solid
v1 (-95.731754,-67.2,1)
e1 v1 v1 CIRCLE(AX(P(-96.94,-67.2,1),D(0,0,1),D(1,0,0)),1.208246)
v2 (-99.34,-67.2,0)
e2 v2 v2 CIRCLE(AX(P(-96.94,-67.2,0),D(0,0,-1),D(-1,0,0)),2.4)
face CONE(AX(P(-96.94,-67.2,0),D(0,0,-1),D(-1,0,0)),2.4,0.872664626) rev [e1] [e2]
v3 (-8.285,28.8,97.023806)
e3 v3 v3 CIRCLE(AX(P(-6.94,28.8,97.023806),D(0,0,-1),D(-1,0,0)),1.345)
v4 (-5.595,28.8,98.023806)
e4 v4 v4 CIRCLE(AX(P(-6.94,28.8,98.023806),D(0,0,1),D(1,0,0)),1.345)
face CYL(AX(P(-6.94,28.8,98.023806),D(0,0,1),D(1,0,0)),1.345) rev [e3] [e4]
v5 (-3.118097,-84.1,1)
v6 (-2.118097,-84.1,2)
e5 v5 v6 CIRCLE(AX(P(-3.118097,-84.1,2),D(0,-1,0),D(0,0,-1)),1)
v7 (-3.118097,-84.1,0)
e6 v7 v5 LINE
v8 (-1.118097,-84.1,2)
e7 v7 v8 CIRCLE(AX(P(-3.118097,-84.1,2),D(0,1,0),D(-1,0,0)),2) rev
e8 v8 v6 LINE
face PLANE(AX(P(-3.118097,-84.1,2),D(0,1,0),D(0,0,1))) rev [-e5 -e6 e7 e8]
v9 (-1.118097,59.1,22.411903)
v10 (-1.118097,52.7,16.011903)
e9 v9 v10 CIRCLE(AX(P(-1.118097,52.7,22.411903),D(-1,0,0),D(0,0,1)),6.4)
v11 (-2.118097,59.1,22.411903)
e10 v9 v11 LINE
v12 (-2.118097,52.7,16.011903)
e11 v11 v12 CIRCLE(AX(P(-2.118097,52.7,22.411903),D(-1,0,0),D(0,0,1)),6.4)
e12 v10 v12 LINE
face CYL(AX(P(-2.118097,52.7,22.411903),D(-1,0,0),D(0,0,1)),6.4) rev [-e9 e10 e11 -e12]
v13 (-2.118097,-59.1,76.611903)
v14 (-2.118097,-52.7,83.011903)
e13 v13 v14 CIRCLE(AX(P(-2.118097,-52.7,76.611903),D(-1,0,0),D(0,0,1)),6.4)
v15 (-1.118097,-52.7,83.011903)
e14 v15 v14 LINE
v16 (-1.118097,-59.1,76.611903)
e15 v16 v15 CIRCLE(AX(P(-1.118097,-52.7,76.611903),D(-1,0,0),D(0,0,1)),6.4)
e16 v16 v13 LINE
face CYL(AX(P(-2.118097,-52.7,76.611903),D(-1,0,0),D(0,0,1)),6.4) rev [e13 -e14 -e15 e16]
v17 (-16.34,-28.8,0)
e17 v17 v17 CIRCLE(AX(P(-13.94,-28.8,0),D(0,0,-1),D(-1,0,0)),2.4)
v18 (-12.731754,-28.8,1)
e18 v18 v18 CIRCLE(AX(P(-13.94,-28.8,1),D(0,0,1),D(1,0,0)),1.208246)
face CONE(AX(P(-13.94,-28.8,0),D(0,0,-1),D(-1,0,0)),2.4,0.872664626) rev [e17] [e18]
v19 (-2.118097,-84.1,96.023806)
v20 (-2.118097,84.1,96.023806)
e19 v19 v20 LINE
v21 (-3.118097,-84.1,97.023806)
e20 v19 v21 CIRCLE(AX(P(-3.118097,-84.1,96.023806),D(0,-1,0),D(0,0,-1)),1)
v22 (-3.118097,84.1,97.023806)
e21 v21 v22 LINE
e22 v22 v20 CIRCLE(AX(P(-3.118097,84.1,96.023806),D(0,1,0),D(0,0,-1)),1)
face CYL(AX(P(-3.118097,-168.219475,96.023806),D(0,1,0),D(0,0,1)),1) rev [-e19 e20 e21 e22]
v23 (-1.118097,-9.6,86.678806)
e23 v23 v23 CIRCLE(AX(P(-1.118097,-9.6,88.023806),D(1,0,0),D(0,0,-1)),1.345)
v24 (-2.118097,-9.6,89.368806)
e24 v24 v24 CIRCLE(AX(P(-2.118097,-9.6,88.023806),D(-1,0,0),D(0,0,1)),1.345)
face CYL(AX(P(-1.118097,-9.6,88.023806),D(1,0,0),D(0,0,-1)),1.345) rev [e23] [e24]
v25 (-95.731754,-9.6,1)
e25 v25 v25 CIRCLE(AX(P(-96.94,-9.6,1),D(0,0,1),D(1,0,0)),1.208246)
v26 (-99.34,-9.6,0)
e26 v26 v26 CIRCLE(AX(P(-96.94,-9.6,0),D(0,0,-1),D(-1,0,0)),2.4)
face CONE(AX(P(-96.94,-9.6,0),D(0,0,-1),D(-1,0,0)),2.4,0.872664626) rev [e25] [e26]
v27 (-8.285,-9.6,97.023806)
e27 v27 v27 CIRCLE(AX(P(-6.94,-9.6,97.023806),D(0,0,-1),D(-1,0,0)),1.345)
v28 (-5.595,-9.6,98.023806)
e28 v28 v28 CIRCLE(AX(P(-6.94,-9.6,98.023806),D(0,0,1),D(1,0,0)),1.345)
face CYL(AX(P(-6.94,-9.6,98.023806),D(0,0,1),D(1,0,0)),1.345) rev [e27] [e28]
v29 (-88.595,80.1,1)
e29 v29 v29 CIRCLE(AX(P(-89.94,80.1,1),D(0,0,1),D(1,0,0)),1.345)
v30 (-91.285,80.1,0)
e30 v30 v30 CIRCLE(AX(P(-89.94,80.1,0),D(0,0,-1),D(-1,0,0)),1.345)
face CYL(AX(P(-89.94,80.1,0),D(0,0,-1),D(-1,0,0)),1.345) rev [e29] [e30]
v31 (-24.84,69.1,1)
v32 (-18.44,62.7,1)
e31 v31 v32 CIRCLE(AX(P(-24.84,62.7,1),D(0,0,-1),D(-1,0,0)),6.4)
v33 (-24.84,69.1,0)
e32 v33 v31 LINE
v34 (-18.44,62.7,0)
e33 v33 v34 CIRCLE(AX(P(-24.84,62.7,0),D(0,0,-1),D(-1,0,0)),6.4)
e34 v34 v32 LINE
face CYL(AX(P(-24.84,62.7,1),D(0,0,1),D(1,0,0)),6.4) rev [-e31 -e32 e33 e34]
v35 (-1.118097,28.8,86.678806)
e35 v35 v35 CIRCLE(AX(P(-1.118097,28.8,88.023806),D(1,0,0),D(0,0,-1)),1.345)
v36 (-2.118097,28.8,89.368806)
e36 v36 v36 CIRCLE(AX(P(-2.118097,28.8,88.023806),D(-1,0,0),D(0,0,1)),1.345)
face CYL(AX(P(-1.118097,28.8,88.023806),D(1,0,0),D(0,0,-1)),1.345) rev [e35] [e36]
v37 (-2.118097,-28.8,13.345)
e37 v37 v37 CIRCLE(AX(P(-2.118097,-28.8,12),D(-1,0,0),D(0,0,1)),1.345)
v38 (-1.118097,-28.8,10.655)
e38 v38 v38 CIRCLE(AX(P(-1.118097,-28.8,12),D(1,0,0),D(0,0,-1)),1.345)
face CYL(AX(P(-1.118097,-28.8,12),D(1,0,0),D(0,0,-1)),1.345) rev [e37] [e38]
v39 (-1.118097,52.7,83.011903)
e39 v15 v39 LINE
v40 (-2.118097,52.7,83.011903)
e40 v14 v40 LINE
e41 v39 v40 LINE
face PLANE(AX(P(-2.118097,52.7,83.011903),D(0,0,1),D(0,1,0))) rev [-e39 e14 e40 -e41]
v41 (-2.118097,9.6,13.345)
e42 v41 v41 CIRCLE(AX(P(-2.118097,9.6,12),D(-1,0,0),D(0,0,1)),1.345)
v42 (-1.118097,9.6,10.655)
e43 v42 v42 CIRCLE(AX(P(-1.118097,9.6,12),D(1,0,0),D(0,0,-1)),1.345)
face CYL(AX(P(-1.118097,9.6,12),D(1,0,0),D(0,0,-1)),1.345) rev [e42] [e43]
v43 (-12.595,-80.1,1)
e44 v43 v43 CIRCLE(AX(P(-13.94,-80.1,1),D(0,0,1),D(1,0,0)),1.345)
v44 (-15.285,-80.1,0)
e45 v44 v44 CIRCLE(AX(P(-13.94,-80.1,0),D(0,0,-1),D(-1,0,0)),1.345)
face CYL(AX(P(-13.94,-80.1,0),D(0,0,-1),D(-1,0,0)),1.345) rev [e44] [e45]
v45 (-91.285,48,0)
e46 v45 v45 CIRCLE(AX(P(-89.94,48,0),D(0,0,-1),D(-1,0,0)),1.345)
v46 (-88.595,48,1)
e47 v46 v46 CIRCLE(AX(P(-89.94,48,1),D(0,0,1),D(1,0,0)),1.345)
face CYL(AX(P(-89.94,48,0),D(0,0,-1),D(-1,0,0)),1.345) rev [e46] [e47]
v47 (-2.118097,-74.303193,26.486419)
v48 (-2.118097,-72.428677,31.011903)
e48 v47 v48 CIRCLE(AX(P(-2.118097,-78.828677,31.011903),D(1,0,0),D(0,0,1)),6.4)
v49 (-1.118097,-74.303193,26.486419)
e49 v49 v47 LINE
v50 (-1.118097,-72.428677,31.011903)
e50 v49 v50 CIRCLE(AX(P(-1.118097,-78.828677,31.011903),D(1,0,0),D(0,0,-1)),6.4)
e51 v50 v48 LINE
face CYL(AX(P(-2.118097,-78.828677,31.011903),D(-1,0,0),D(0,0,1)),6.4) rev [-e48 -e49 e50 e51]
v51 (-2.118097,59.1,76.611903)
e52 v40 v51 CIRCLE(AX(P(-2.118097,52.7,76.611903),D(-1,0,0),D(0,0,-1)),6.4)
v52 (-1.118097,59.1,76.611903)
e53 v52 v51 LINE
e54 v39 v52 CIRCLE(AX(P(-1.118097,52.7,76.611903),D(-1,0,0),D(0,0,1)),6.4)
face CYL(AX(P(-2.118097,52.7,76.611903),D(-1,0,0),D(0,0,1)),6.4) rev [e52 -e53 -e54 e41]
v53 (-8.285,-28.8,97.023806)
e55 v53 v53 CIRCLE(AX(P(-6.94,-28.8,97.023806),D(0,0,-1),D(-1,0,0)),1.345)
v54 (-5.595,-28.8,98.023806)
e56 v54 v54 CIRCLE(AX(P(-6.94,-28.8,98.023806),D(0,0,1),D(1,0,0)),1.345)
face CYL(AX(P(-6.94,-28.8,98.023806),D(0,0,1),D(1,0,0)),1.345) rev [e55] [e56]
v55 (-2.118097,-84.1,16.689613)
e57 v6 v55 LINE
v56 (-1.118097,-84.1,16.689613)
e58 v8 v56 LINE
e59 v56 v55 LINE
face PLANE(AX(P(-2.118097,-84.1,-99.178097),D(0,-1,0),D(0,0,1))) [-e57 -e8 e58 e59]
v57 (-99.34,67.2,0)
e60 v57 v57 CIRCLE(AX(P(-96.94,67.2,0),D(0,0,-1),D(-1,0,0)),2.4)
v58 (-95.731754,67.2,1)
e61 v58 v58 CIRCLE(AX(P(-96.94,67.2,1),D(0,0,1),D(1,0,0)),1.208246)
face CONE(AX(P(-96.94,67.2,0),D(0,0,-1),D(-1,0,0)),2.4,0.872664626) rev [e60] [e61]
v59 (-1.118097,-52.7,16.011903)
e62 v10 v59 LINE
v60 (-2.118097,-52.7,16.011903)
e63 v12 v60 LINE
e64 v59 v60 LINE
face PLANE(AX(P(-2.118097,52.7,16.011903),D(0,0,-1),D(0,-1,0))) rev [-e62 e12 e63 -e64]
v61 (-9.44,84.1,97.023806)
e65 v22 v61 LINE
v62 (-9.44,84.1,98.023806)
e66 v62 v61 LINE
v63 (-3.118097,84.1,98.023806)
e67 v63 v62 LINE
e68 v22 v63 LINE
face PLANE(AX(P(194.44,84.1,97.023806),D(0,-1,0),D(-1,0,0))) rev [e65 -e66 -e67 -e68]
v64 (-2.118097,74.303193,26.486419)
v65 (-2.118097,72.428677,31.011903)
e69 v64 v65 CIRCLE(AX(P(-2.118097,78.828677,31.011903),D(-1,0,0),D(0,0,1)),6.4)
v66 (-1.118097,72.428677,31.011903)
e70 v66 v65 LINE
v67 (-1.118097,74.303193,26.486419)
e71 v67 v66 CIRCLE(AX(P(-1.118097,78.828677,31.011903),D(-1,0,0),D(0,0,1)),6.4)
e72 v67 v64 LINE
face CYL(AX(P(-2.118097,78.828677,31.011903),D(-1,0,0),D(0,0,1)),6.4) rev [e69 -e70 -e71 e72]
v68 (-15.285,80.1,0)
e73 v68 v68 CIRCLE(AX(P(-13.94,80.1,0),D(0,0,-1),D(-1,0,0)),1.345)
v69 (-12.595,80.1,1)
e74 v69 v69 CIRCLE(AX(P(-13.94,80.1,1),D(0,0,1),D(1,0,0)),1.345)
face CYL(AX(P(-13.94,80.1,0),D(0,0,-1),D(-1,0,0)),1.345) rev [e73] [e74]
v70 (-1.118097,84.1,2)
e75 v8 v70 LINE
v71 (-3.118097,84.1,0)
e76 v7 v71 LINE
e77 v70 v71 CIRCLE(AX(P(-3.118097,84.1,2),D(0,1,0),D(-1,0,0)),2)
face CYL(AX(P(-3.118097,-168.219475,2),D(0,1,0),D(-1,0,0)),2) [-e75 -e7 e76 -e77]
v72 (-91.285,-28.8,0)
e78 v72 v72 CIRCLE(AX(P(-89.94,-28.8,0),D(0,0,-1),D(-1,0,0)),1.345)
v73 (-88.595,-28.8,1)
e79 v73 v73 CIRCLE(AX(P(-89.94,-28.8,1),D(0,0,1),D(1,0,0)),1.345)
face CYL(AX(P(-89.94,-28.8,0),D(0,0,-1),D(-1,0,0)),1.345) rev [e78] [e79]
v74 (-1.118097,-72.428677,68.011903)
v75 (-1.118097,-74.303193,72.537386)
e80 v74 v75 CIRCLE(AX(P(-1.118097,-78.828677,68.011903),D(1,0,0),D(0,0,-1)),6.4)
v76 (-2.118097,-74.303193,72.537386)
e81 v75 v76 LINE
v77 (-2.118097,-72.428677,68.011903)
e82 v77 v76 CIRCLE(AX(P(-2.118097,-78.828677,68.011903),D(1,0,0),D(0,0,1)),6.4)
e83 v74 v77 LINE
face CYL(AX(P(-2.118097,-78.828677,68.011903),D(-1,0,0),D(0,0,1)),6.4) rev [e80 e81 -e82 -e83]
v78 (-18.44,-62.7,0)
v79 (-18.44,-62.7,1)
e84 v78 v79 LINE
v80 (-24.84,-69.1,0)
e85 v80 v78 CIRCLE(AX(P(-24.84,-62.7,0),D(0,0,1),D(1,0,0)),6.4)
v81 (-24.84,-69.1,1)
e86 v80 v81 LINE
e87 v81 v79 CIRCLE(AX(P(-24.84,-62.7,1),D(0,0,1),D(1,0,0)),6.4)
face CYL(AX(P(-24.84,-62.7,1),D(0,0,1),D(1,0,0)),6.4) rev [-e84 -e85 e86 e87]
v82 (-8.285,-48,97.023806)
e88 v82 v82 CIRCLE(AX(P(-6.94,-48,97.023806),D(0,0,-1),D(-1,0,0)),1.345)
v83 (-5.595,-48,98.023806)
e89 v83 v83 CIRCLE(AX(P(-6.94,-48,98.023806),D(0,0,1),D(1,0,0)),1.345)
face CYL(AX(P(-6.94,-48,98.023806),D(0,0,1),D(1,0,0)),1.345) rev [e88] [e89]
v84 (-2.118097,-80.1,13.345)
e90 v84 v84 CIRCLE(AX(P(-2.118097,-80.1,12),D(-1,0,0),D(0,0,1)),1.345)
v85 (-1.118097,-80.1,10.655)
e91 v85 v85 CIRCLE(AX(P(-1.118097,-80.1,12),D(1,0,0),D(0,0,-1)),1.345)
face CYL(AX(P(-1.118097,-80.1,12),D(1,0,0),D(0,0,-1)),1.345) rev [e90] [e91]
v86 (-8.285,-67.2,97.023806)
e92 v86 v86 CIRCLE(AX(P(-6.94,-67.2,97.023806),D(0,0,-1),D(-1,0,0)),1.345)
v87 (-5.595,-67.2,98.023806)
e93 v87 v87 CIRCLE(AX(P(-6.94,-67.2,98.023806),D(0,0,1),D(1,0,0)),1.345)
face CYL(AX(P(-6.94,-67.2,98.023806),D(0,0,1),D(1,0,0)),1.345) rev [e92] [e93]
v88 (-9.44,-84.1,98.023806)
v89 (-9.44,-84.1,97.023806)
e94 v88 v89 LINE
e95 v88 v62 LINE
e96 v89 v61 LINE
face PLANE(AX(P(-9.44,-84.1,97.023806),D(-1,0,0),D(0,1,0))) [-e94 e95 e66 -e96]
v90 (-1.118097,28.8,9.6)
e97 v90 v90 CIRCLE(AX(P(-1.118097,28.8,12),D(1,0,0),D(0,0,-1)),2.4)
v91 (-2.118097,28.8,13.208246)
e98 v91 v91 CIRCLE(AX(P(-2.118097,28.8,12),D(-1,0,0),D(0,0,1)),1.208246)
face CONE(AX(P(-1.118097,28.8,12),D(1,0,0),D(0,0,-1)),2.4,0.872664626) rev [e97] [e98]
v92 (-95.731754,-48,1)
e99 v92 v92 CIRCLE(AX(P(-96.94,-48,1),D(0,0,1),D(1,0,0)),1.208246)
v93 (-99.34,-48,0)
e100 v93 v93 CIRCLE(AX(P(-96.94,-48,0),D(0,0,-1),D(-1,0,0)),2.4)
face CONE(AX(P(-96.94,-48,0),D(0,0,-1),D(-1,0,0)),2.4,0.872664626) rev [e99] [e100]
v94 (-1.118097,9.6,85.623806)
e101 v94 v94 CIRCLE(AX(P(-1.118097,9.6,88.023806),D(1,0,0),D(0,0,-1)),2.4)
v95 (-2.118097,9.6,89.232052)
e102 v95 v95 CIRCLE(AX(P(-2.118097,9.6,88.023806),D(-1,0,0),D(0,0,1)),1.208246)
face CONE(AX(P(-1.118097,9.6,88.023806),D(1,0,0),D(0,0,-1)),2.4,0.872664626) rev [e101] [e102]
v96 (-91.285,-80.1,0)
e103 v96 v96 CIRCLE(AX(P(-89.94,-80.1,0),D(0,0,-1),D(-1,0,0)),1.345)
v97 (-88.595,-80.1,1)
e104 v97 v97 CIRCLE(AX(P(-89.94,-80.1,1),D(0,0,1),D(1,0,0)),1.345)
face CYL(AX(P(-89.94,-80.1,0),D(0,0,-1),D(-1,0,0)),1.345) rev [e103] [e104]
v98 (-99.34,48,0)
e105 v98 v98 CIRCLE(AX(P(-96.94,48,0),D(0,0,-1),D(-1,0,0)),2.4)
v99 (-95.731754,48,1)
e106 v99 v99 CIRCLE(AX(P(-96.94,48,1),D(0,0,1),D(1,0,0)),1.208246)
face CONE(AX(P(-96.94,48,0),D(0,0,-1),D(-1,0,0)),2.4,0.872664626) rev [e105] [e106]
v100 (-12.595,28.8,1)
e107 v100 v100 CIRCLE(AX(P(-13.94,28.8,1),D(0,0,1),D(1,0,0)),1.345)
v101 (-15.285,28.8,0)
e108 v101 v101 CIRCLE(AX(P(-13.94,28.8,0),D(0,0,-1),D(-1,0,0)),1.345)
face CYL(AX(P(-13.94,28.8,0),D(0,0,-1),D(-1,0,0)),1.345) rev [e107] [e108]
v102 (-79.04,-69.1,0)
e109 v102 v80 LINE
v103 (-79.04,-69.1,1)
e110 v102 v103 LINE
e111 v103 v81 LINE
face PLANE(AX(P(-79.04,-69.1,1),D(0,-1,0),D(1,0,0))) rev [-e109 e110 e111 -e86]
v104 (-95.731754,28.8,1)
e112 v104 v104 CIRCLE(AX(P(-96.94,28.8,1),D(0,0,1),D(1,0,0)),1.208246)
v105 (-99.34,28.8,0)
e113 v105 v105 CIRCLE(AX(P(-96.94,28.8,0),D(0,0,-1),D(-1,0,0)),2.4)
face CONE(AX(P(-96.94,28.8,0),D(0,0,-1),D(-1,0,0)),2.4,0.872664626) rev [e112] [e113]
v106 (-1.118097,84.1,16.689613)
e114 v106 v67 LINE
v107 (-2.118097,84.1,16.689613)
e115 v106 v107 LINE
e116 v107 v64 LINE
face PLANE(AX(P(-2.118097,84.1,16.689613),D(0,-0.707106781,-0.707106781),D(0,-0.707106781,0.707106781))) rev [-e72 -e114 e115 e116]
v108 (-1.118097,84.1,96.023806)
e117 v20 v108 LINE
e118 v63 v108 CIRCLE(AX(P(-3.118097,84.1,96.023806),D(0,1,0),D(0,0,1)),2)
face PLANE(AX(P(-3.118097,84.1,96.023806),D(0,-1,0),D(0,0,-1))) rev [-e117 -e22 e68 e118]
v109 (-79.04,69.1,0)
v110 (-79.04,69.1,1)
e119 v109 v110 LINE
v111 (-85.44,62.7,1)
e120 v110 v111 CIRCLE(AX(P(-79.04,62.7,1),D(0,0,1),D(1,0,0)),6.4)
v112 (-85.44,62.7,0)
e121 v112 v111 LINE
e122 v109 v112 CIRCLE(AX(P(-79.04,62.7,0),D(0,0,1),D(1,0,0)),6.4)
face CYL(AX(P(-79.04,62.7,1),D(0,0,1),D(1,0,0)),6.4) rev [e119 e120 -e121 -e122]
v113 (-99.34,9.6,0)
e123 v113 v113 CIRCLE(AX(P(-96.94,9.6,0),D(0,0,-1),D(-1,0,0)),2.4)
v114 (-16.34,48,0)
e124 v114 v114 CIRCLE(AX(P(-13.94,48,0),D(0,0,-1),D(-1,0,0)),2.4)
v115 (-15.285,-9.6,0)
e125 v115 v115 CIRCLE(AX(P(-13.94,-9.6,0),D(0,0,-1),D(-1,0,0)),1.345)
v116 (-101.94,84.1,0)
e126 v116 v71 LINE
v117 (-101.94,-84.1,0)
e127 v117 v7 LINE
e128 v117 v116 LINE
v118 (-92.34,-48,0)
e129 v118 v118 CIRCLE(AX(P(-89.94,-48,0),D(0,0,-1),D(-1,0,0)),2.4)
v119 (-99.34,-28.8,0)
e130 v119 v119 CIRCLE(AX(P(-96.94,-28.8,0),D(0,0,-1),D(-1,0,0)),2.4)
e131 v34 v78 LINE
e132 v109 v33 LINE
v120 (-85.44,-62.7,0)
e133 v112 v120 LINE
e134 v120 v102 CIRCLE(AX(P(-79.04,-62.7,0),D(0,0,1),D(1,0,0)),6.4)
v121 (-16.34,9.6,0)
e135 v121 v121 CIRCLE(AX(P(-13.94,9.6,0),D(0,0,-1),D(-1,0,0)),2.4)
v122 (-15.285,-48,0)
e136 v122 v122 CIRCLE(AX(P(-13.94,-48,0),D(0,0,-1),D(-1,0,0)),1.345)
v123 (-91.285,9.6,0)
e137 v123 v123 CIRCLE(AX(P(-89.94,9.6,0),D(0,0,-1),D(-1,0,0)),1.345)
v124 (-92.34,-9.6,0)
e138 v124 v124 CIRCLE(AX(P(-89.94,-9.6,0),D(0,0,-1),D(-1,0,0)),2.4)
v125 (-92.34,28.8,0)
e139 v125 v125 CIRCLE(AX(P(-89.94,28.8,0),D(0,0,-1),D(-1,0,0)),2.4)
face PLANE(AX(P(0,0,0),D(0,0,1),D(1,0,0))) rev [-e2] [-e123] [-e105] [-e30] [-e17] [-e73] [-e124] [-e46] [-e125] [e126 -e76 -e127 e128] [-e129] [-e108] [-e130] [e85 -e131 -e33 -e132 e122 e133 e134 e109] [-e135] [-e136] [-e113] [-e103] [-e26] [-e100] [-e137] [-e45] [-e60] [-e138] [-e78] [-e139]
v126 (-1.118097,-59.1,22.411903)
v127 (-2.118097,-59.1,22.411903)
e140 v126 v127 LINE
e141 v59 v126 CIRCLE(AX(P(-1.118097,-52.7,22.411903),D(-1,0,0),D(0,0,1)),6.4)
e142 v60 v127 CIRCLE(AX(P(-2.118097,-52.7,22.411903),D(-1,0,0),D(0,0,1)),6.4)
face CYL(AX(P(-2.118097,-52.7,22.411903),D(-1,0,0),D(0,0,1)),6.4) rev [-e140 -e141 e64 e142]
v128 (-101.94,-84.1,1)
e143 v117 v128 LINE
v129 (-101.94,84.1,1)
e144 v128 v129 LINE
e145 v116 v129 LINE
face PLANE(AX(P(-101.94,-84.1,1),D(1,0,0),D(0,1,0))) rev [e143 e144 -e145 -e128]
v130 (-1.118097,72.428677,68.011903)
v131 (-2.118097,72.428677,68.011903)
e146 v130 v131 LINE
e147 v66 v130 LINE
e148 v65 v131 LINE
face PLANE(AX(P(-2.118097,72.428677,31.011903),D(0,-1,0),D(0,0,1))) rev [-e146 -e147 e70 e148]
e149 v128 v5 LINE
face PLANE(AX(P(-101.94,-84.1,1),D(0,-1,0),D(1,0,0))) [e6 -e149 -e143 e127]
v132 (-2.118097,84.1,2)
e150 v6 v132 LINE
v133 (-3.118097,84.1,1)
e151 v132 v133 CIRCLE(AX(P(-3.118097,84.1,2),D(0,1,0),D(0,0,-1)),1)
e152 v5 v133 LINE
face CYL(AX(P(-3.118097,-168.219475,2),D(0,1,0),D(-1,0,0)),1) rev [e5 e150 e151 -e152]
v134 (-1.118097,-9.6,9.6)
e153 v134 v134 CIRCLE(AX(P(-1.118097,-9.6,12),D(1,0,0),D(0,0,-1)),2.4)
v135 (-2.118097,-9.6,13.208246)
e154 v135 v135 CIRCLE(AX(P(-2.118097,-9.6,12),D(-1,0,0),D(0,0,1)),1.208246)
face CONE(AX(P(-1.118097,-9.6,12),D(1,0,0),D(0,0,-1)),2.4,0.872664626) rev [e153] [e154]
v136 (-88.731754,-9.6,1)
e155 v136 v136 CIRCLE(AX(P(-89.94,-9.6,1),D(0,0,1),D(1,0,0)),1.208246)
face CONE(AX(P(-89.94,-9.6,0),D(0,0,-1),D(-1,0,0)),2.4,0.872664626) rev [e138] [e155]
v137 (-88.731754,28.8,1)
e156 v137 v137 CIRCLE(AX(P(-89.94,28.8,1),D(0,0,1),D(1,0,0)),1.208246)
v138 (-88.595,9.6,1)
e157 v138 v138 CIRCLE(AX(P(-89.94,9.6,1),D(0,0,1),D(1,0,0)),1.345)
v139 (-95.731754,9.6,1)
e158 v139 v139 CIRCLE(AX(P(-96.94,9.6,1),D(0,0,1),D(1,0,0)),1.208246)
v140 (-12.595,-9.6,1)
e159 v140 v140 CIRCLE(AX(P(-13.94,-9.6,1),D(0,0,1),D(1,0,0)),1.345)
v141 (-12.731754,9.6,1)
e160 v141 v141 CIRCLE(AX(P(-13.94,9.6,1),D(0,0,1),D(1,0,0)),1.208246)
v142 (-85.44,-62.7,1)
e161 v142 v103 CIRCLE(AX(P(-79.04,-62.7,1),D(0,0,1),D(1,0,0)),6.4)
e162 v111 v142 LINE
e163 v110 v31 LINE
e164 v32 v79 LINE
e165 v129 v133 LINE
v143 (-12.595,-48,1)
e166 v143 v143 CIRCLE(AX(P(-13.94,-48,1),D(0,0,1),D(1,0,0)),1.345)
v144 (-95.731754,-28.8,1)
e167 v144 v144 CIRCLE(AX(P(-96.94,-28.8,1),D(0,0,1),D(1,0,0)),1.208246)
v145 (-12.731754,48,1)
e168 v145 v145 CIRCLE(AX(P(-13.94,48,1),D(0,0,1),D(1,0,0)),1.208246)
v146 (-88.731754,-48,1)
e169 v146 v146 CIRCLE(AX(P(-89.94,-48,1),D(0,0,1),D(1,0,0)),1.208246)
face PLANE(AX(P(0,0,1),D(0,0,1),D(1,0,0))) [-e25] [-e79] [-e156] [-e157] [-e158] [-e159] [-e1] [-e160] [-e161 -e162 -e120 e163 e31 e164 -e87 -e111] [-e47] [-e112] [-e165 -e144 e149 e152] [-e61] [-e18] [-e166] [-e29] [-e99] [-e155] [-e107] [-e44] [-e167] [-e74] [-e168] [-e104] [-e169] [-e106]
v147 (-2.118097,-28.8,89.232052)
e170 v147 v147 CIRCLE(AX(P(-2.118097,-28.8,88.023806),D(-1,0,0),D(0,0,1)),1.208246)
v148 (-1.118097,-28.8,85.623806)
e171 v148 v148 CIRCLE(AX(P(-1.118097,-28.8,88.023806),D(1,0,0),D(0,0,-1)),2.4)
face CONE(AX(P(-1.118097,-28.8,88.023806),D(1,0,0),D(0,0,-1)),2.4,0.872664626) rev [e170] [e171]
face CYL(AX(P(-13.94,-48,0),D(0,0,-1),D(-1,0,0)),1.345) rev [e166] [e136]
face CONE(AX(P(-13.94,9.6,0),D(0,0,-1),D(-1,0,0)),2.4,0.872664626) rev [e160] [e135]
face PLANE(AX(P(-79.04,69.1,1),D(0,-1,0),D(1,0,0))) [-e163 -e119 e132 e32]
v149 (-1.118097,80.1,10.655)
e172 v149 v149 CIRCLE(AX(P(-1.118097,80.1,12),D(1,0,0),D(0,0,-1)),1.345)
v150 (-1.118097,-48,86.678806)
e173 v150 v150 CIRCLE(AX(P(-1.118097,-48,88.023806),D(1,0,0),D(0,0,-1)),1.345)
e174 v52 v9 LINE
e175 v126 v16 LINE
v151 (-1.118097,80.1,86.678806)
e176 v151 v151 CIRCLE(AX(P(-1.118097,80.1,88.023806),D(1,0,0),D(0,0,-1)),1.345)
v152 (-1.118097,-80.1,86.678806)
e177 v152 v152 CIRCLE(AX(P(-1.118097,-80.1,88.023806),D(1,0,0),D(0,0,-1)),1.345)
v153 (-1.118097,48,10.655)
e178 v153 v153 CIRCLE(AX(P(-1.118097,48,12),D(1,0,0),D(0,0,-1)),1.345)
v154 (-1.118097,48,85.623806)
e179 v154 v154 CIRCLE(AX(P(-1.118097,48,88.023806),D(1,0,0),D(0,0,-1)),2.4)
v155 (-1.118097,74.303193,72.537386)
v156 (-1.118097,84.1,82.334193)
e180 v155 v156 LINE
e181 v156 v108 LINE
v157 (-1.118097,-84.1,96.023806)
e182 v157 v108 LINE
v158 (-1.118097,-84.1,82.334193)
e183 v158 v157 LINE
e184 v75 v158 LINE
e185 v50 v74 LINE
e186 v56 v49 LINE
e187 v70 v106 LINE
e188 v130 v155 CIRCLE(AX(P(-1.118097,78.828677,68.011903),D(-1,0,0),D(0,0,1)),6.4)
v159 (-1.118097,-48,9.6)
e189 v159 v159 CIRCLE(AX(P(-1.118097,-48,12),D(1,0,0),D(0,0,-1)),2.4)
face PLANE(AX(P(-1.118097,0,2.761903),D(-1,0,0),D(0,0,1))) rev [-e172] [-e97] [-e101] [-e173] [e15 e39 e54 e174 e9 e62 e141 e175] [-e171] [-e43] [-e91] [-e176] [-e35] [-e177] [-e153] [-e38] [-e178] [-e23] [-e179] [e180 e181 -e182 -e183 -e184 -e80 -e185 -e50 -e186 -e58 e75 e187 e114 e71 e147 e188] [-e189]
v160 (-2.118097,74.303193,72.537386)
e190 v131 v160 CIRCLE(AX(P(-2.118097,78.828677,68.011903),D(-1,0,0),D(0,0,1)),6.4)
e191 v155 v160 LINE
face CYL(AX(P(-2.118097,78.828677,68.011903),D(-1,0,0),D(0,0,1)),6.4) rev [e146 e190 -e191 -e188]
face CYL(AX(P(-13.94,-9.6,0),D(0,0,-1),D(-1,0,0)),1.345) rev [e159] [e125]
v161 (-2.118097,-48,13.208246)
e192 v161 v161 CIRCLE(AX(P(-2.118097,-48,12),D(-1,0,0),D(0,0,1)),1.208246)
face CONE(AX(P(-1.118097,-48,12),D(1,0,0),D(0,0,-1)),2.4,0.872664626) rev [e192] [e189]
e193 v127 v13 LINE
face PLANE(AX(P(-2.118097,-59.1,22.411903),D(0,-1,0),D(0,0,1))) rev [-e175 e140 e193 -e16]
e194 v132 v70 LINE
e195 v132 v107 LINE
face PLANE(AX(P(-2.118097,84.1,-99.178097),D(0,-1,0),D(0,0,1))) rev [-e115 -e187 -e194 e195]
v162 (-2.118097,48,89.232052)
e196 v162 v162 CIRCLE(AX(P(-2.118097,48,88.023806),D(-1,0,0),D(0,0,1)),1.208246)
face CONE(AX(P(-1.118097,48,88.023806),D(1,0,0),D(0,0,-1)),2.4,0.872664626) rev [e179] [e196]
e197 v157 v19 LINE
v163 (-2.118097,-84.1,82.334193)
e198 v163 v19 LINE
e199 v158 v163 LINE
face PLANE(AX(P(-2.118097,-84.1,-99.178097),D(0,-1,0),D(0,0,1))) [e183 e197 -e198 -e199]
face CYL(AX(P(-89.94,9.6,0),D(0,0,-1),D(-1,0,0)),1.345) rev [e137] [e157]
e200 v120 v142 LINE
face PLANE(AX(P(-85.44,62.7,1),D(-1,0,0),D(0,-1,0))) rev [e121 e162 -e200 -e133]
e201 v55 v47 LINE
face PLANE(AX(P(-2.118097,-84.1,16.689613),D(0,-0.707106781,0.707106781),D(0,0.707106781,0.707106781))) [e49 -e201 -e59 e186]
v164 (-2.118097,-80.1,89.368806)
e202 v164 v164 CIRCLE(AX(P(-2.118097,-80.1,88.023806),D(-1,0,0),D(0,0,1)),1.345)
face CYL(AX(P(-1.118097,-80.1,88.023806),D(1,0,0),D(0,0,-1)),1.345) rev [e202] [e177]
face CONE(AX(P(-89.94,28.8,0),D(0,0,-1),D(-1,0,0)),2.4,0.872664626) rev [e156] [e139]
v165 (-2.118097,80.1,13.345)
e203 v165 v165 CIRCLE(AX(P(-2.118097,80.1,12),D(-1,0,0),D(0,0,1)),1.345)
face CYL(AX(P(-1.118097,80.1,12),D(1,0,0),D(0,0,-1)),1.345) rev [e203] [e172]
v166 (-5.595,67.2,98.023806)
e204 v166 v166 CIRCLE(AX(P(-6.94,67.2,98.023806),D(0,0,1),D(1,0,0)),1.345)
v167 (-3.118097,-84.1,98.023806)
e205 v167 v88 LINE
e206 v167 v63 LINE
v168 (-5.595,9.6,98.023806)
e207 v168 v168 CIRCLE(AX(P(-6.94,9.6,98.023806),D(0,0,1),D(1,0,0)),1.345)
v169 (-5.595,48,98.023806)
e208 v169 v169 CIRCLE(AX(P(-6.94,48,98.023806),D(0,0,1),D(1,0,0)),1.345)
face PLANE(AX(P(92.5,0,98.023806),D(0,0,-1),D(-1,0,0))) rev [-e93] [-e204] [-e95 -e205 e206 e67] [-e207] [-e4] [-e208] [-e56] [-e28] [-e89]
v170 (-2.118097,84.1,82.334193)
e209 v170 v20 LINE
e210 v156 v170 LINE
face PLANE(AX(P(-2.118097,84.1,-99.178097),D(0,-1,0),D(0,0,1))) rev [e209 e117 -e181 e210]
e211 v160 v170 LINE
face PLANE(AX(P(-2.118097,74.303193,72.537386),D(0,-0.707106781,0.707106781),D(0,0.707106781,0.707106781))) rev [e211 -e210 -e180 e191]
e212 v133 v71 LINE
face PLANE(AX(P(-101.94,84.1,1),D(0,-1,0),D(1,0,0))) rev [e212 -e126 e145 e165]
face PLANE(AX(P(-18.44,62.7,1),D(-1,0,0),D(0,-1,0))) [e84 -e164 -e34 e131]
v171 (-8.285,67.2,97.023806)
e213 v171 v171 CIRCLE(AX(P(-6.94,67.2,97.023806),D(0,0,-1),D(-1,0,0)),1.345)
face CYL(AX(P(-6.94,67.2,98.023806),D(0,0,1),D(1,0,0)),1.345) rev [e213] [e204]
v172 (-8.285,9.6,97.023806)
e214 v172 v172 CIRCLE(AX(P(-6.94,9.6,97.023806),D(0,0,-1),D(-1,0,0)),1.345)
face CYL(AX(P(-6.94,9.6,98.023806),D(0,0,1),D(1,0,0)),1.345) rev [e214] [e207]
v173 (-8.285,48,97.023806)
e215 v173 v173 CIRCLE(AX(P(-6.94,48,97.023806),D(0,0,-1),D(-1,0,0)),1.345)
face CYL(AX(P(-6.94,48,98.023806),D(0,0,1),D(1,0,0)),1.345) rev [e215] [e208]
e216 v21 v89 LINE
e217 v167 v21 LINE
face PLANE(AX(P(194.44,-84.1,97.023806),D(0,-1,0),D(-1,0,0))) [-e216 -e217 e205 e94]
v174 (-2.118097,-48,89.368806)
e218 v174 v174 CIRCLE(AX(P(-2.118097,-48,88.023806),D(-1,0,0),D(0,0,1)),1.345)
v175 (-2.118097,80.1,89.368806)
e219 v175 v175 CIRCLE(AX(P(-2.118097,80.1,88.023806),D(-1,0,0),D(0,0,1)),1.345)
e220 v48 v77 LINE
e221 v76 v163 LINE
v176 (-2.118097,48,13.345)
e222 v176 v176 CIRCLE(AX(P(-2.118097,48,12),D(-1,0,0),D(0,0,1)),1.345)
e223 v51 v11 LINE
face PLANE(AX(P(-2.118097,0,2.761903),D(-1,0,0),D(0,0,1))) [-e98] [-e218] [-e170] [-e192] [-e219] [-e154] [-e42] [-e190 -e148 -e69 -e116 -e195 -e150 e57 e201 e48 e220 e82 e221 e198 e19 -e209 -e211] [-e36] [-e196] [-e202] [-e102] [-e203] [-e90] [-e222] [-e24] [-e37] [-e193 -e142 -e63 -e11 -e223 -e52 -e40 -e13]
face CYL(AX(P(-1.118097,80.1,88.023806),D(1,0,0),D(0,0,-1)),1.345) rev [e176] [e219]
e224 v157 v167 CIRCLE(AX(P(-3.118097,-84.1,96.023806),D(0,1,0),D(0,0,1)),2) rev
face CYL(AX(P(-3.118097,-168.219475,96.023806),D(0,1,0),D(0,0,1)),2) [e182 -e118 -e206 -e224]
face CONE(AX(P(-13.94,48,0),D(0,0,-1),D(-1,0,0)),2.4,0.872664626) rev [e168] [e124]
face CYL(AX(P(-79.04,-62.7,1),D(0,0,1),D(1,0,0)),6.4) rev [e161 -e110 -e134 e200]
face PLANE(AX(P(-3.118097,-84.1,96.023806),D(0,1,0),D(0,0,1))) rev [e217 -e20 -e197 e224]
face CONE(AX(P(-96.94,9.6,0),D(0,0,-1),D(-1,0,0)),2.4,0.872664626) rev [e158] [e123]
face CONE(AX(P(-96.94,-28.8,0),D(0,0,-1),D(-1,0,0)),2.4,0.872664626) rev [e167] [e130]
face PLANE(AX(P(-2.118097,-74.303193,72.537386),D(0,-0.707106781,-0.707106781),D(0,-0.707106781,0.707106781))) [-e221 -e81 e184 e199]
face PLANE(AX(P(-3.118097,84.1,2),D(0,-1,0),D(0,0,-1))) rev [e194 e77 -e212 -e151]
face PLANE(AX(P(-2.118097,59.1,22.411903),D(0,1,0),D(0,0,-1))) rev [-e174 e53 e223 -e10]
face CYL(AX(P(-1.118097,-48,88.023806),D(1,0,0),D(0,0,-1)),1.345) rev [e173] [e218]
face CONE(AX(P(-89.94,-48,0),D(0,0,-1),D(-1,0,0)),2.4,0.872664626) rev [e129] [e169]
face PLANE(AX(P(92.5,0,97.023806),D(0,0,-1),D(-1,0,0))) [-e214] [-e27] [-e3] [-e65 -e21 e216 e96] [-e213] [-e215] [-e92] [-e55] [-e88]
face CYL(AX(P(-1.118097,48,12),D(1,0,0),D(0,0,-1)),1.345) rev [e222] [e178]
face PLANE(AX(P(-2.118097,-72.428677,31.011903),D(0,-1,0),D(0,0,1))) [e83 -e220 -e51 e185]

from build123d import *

# Parameters (mm, degrees)
SKETCH1_W                                       = 203.88
SKETCH1_H                                       = 168.2
BOSS_EXTRUDE1_DEPTH                             = 1
CUT_EXTRUDE1_DEPTH                              = 133.157381935
CUT_EXTRUDE2_DEPTH                              = 133.157381935
CUT_EXTRUDE3_DEPTH                              = 133.157381935
SKETCHED_START                                  = -1.329337245
SKETCHED_BEND11_OUTLINE_W                       = 168.2
SKETCHED_BEND11_OUTLINE_H                       = 1
SKETCHED_BEND11_DEPTH                           = 103.269337245
SKETCHED_START_2                                = -3.118097245
SKETCHED_BEND11_2_DEPTH                         = 2
SKETCHED_START_3                                = -84.1
SKETCHED_BEND11_3_DEPTH                         = 168.2
SKETCHED_BEND12_DEPTH                           = 168.2
SKETCHED_BEND12_2_DEPTH                         = 168.2
CSK_FOR_M2_FLAT_HEAD_MACHINE_SCREW6_AT_2_COUNT  = 2
CSK_FOR_M2_FLAT_HEAD_MACHINE_SCREW6_AT_2_PITCH  = 19.2
CSK_FOR_M2_FLAT_HEAD_MACHINE_SCREW6_AT_3_COUNT  = 2
CSK_FOR_M2_FLAT_HEAD_MACHINE_SCREW6_AT_3_PITCH  = 38.4
CSK_FOR_M2_FLAT_HEAD_MACHINE_SCREW6_AT_4_COUNT  = 2
CSK_FOR_M2_FLAT_HEAD_MACHINE_SCREW6_AT_4_PITCH  = 57.6
CSK_FOR_M2_FLAT_HEAD_MACHINE_SCREW6_AT_5_COUNT  = 2
CSK_FOR_M2_FLAT_HEAD_MACHINE_SCREW6_AT_5_PITCH  = 76.8
CSK_FOR_M2_FLAT_HEAD_MACHINE_SCREW6_AT_6_COUNT  = 2
CSK_FOR_M2_FLAT_HEAD_MACHINE_SCREW6_AT_6_PITCH  = 96
CSK_FOR_M2_FLAT_HEAD_MACHINE_SCREW6_AT_7_COUNT  = 2
CSK_FOR_M2_FLAT_HEAD_MACHINE_SCREW6_AT_7_PITCH  = 115.2
CSK_FOR_M2_FLAT_HEAD_MACHINE_SCREW6_AT_8_COUNT  = 2
CSK_FOR_M2_FLAT_HEAD_MACHINE_SCREW6_AT_8_PITCH  = 134.4
CSK_FOR_M2_FLAT_HEAD_MACHINE_SCREW6_AT_9_COUNT  = 2
CSK_FOR_M2_FLAT_HEAD_MACHINE_SCREW6_AT_9_PITCH  = 96.254870007
CSK_FOR_M2_FLAT_HEAD_MACHINE_SCREW6_AT_1_COUNT  = 2
CSK_FOR_M2_FLAT_HEAD_MACHINE_SCREW6_AT_1_PITCH  = 58.023788225
CSK_FOR_M2_FLAT_HEAD_MACHINE_SCREW6_2_COUNT     = 2
CSK_FOR_M2_FLAT_HEAD_MACHINE_SCREW6_2_PITCH     = 20.436242316
CSK_FOR_M2_FLAT_HEAD_MACHINE_SCREW6_3_COUNT     = 2
CSK_FOR_M2_FLAT_HEAD_MACHINE_SCREW6_3_PITCH     = 91.452501333
CSK_FOR_M2_FLAT_HEAD_MACHINE_SCREW6_4_COUNT     = 2
CSK_FOR_M2_FLAT_HEAD_MACHINE_SCREW6_4_PITCH     = 113.080679163
CSK_FOR_M2_FLAT_HEAD_MACHINE_SCREW6_5_COUNT     = 2
CSK_FOR_M2_FLAT_HEAD_MACHINE_SCREW6_5_PITCH     = 141.986055653
F_1_0MM_DOWEL_HOLE2_D                           = 2.69
F_1_0MM_DOWEL_HOLE3_D                           = 2.69
CSK_FOR_M2_FLAT_HEAD_MACHINE_SCREW5_D           = 2.39
CSK_FOR_M2_FLAT_HEAD_MACHINE_SCREW5_CSINK_D     = 4.8
CSK_FOR_M2_FLAT_HEAD_MACHINE_SCREW5_CSINK_ANGLE = 100
F_1_0MM_DOWEL_HOLE4_D                           = 2.69
F_1_0MM_DOWEL_HOLE4_DEPTH                       = 1


with BuildPart() as part:
    # Sketch1 → Boss-Extrude1 (new body)
    with BuildSketch(Plane.XY):
        Rectangle(SKETCH1_W, SKETCH1_H)
    extrude(amount=BOSS_EXTRUDE1_DEPTH)

    # Sketch2 → Cut-Extrude1 (cut, through all)
    with BuildSketch(Plane.XY.offset(1)):
        with BuildLine():
            Line((-85.44, 62.7), (-85.44, -62.7))
            ThreePointArc((-85.44, -62.7), (-83.5654834, -67.2254834), (-79.04, -69.1))
            Line((-79.04, -69.1), (-24.84, -69.1))
            ThreePointArc((-24.84, -69.1), (-20.3145166, -67.2254834), (-18.44, -62.7))
            Line((-18.44, -62.7), (-18.44, 62.7))
            ThreePointArc((-18.44, 62.7), (-20.3145166, 67.2254834), (-24.84, 69.1))
            Line((-24.84, 69.1), (-79.04, 69.1))
            ThreePointArc((-79.04, 69.1), (-83.5654834, 67.2254834), (-85.44, 62.7))
        make_face()
    extrude(amount=-CUT_EXTRUDE1_DEPTH, mode=Mode.SUBTRACT)

    # Sketch3 → Cut-Extrude2 (cut, through all)
    with BuildSketch(Plane.XY.offset(1)):
        with BuildLine():
            Line((13.25, 52.7), (13.25, -52.7))
            ThreePointArc((13.25, -52.7), (15.1245166, -57.2254834), (19.65, -59.1))
            Line((19.65, -59.1), (73.85, -59.1))
            ThreePointArc((73.85, -59.1), (78.3754834, -57.2254834), (80.25, -52.7))
            Line((80.25, -52.7), (80.25, 52.7))
            ThreePointArc((80.25, 52.7), (78.3754834, 57.2254834), (73.85, 59.1))
            Line((73.85, 59.1), (19.65, 59.1))
            ThreePointArc((19.65, 59.1), (15.1245166, 57.2254834), (13.25, 52.7))
        make_face()
    extrude(amount=-CUT_EXTRUDE2_DEPTH, mode=Mode.SUBTRACT)

    # Sketch4 → Cut-Extrude3 (cut, through all)
    with BuildSketch(Plane.XY.offset(1)):
        with BuildLine():
            Line((13.927709828, 84.1), (23.7245166, 74.303193228))
            ThreePointArc((23.7245166, 74.303193228), (25.800826033, 72.915847619), (28.25, 72.428676627))
            Line((28.25, 72.428676627), (65.25, 72.428676627))
            ThreePointArc((65.25, 72.428676627), (67.699173967, 72.915847619), (69.7754834, 74.303193228))
            Line((69.7754834, 74.303193228), (79.572290172, 84.1))
            Line((79.572290172, 84.1), (13.927709828, 84.1))
        make_face()
    cut_extrude3 = extrude(amount=-CUT_EXTRUDE3_DEPTH, mode=Mode.SUBTRACT)

    # Mirror1: Cut-Extrude3 across plane
    add(cut_extrude3.mirror(Plane.ZX), mode=Mode.SUBTRACT)

    # Sketched Bend11: read off the stored shape, not the designer's step
    # Sketched Bend11 outline → Sketched Bend11 (cut)
    with BuildSketch(Plane.YZ.offset(SKETCHED_START)):
        with Locations((0, 0.5)):
            Rectangle(SKETCHED_BEND11_OUTLINE_W, SKETCHED_BEND11_OUTLINE_H)
    extrude(amount=SKETCHED_BEND11_DEPTH, mode=Mode.SUBTRACT)

    # Sketched Bend11 2 outline → Sketched Bend11 2 (add)
    with BuildSketch(Plane.YZ.offset(SKETCHED_START_2)):
        with BuildLine():
            Line((-72.428676627, 68.011902755), (-72.428676627, 31.011902755))
            ThreePointArc((-72.428676627, 31.011902755), (-72.915847619, 28.562728788), (-74.303193228, 26.486419355))
            Line((-74.303193228, 26.486419355), (-84.1, 16.689612583))
            Line((-84.1, 16.689612583), (-84.1, 1))
            Line((-84.1, 1), (84.1, 1))
            Line((84.1, 1), (84.1, 16.689612583))
            Line((84.1, 16.689612583), (74.303193228, 26.486419355))
            ThreePointArc((74.303193228, 26.486419355), (72.915847619, 28.562728788), (72.428676627, 31.011902755))
            Line((72.428676627, 31.011902755), (72.428676627, 68.011902755))
            ThreePointArc((72.428676627, 68.011902755), (72.915847619, 70.461076722), (74.303193228, 72.537386154))
            Line((74.303193228, 72.537386154), (84.1, 82.334192927))
            Line((84.1, 82.334192927), (84.1, 104.701902755))
            Line((84.1, 104.701902755), (-84.1, 104.701902755))
            Line((-84.1, 104.701902755), (-84.1, 82.334192927))
            Line((-84.1, 82.334192927), (-74.303193228, 72.537386154))
            ThreePointArc((-74.303193228, 72.537386154), (-72.915847619, 70.461076722), (-72.428676627, 68.011902755))
        make_face()
        with BuildLine():
            Line((52.7, 16.011902755), (-52.7, 16.011902755))
            ThreePointArc((-52.7, 16.011902755), (-57.2254834, 17.886419355), (-59.1, 22.411902755))
            Line((-59.1, 22.411902755), (-59.1, 76.611902755))
            ThreePointArc((-59.1, 76.611902755), (-57.225483399, 81.137386155), (-52.7, 83.011902755))
            Line((-52.7, 83.011902755), (52.7, 83.011902755))
            ThreePointArc((52.7, 83.011902755), (57.225483399, 81.137386154), (59.1, 76.611902755))
            Line((59.1, 76.611902755), (59.1, 22.411902755))
            ThreePointArc((59.1, 22.411902755), (57.2254834, 17.886419355), (52.7, 16.011902755))
        make_face(mode=Mode.SUBTRACT)
    extrude(amount=SKETCHED_BEND11_2_DEPTH)

    # Sketched Bend11 3 outline → Sketched Bend11 3 (cut)
    with BuildSketch(Plane(origin=(0, 0, 0), x_dir=(1, 0, 0), z_dir=(0, 1, 0)).offset(SKETCHED_START_3)):
        with BuildLine():
            ThreePointArc((-3.118097245, 0), (-1.703883683, -0.585786438), (-1.118097245, -2))
            Line((-1.118097245, -2), (-1.118097245, -1))
            Line((-1.118097245, -1), (-1.329337245, -1))
            Line((-1.329337245, -1), (-1.329337245, 0))
            Line((-1.329337245, 0), (-3.118097245, 0))
        make_face()
        with BuildLine():
            ThreePointArc((-2.118097245, -2), (-2.410990464, -1.292893219), (-3.118097245, -1))
            Line((-3.118097245, -1), (-3.118097245, -104.701902755))
            Line((-3.118097245, -104.701902755), (-2.118097245, -104.701902755))
            Line((-2.118097245, -104.701902755), (-2.118097245, -2))
        make_face()
    extrude(amount=SKETCHED_BEND11_3_DEPTH, mode=Mode.SUBTRACT)

    # Sketched Bend12: read off the stored shape, not the designer's step
    # Sketched Bend12 outline → Sketched Bend12 (cut)
    with BuildSketch(Plane(origin=(0, 0, 0), x_dir=(1, 0, 0), z_dir=(0, 1, 0)).offset(SKETCHED_START_3)):
        with BuildLine():
            ThreePointArc((-1.118097245, -96.02380551), (-1.386046438, -97.02380551), (-2.118097245, -97.755856317))
            Line((-2.118097245, -97.755856317), (-2.118097245, -104.701902755))
            Line((-2.118097245, -104.701902755), (-1.118097245, -104.701902755))
            Line((-1.118097245, -104.701902755), (-1.118097245, -96.02380551))
        make_face()
    extrude(amount=SKETCHED_BEND12_DEPTH, mode=Mode.SUBTRACT)

    # Sketched Bend12 2 outline → Sketched Bend12 2 (add)
    with BuildSketch(Plane(origin=(0, 0, 0), x_dir=(1, 0, 0), z_dir=(0, 1, 0)).offset(SKETCHED_START_3)):
        with BuildLine():
            ThreePointArc((-2.118097245, -96.02380551), (-2.410990464, -96.730912291), (-3.118097245, -97.02380551))
            Line((-3.118097245, -97.02380551), (-9.44, -97.02380551))
            Line((-9.44, -97.02380551), (-9.44, -98.02380551))
            Line((-9.44, -98.02380551), (-3.118097245, -98.02380551))
            ThreePointArc((-3.118097245, -98.02380551), (-2.600459155, -97.955657162), (-2.118097245, -97.755856317))
            Line((-2.118097245, -97.755856317), (-2.118097245, -96.02380551))
        make_face()
    extrude(amount=SKETCHED_BEND12_2_DEPTH)

    # Sketch78 → CSK for M2 Flat Head Machine Screw6 (revolve, cut)
    with BuildSketch(Plane(origin=(-96.94, -67.2, 0), x_dir=(0, 1, 0), z_dir=(1, 0, 0))):
        Polygon((0, 0), (0, 1), (1.195, 1), (1.195, 1.011115056), (2.4, 0), align=None)
    csk_for_m2_flat_head_machine_screw6 = revolve(axis=Axis((-96.94, -67.2, -6.35), (0, 0, 1)), mode=Mode.SUBTRACT)

    # CSK for M2 Flat Head Machine Screw6 at 2: CSK for M2 Flat Head Machine Screw6 ×2
    with Locations(*[(0, i * CSK_FOR_M2_FLAT_HEAD_MACHINE_SCREW6_AT_2_PITCH, 0) for i in range(1, CSK_FOR_M2_FLAT_HEAD_MACHINE_SCREW6_AT_2_COUNT)]):
        add(csk_for_m2_flat_head_machine_screw6, mode=Mode.SUBTRACT)

    # CSK for M2 Flat Head Machine Screw6 at 3: CSK for M2 Flat Head Machine Screw6 ×2
    with Locations(*[(0, i * CSK_FOR_M2_FLAT_HEAD_MACHINE_SCREW6_AT_3_PITCH, 0) for i in range(1, CSK_FOR_M2_FLAT_HEAD_MACHINE_SCREW6_AT_3_COUNT)]):
        add(csk_for_m2_flat_head_machine_screw6, mode=Mode.SUBTRACT)

    # CSK for M2 Flat Head Machine Screw6 at 4: CSK for M2 Flat Head Machine Screw6 ×2
    with Locations(*[(0, i * CSK_FOR_M2_FLAT_HEAD_MACHINE_SCREW6_AT_4_PITCH, 0) for i in range(1, CSK_FOR_M2_FLAT_HEAD_MACHINE_SCREW6_AT_4_COUNT)]):
        add(csk_for_m2_flat_head_machine_screw6, mode=Mode.SUBTRACT)

    # CSK for M2 Flat Head Machine Screw6 at 5: CSK for M2 Flat Head Machine Screw6 ×2
    with Locations(*[(0, i * CSK_FOR_M2_FLAT_HEAD_MACHINE_SCREW6_AT_5_PITCH, 0) for i in range(1, CSK_FOR_M2_FLAT_HEAD_MACHINE_SCREW6_AT_5_COUNT)]):
        add(csk_for_m2_flat_head_machine_screw6, mode=Mode.SUBTRACT)

    # CSK for M2 Flat Head Machine Screw6 at 6: CSK for M2 Flat Head Machine Screw6 ×2
    with Locations(*[(0, i * CSK_FOR_M2_FLAT_HEAD_MACHINE_SCREW6_AT_6_PITCH, 0) for i in range(1, CSK_FOR_M2_FLAT_HEAD_MACHINE_SCREW6_AT_6_COUNT)]):
        add(csk_for_m2_flat_head_machine_screw6, mode=Mode.SUBTRACT)

    # CSK for M2 Flat Head Machine Screw6 at 7: CSK for M2 Flat Head Machine Screw6 ×2
    with Locations(*[(0, i * CSK_FOR_M2_FLAT_HEAD_MACHINE_SCREW6_AT_7_PITCH, 0) for i in range(1, CSK_FOR_M2_FLAT_HEAD_MACHINE_SCREW6_AT_7_COUNT)]):
        add(csk_for_m2_flat_head_machine_screw6, mode=Mode.SUBTRACT)

    # CSK for M2 Flat Head Machine Screw6 at 8: CSK for M2 Flat Head Machine Screw6 ×2
    with Locations(*[(0, i * CSK_FOR_M2_FLAT_HEAD_MACHINE_SCREW6_AT_8_PITCH, 0) for i in range(1, CSK_FOR_M2_FLAT_HEAD_MACHINE_SCREW6_AT_8_COUNT)]):
        add(csk_for_m2_flat_head_machine_screw6, mode=Mode.SUBTRACT)

    # CSK for M2 Flat Head Machine Screw6 at 9: CSK for M2 Flat Head Machine Screw6 ×2
    with Locations(*[Vector(0.07272359309731836, 0.9973521339060822, 0) * (i * CSK_FOR_M2_FLAT_HEAD_MACHINE_SCREW6_AT_9_PITCH) for i in range(1, CSK_FOR_M2_FLAT_HEAD_MACHINE_SCREW6_AT_9_COUNT)]):
        add(csk_for_m2_flat_head_machine_screw6, mode=Mode.SUBTRACT)

    # CSK for M2 Flat Head Machine Screw6 at 1: CSK for M2 Flat Head Machine Screw6 ×2
    with Locations(*[Vector(0.12064017559203119, 0.9926963020144298, 0) * (i * CSK_FOR_M2_FLAT_HEAD_MACHINE_SCREW6_AT_1_PITCH) for i in range(1, CSK_FOR_M2_FLAT_HEAD_MACHINE_SCREW6_AT_1_COUNT)]):
        add(csk_for_m2_flat_head_machine_screw6, mode=Mode.SUBTRACT)

    # CSK for M2 Flat Head Machine Screw6  2: CSK for M2 Flat Head Machine Screw6 ×2
    with Locations(*[Vector(0.34252872381068933, 0.939507356737892, 0) * (i * CSK_FOR_M2_FLAT_HEAD_MACHINE_SCREW6_2_PITCH) for i in range(1, CSK_FOR_M2_FLAT_HEAD_MACHINE_SCREW6_2_COUNT)]):
        add(csk_for_m2_flat_head_machine_screw6, mode=Mode.SUBTRACT)

    # CSK for M2 Flat Head Machine Screw6  3: CSK for M2 Flat Head Machine Screw6 ×2
    with Locations(*[Vector(0.9075749573878468, 0.41989010076738914, 0) * (i * CSK_FOR_M2_FLAT_HEAD_MACHINE_SCREW6_3_PITCH) for i in range(1, CSK_FOR_M2_FLAT_HEAD_MACHINE_SCREW6_3_COUNT)]):
        add(csk_for_m2_flat_head_machine_screw6, mode=Mode.SUBTRACT)

    # CSK for M2 Flat Head Machine Screw6  4: CSK for M2 Flat Head Machine Screw6 ×2
    with Locations(*[Vector(0.7339892244567021, 0.6791611137141532, 0) * (i * CSK_FOR_M2_FLAT_HEAD_MACHINE_SCREW6_4_PITCH) for i in range(1, CSK_FOR_M2_FLAT_HEAD_MACHINE_SCREW6_4_COUNT)]):
        add(csk_for_m2_flat_head_machine_screw6, mode=Mode.SUBTRACT)

    # CSK for M2 Flat Head Machine Screw6  5: CSK for M2 Flat Head Machine Screw6 ×2
    with Locations(*[Vector(0.5845644462624657, 0.8113472796317597, 0) * (i * CSK_FOR_M2_FLAT_HEAD_MACHINE_SCREW6_5_PITCH) for i in range(1, CSK_FOR_M2_FLAT_HEAD_MACHINE_SCREW6_5_COUNT)]):
        add(csk_for_m2_flat_head_machine_screw6, mode=Mode.SUBTRACT)

    # Ø1.0mm Dowel Hole2 (through all)
    with Locations(Plane(origin=(0, 0, 0), x_dir=(-1, 0, 0), z_dir=(0, 0, -1))):
        with Locations((89.94, 80.1), (89.94, -80.1), (13.94, -80.1), (13.94, 80.1), (89.94, 48), (89.94, 9.6), (89.94, -28.8), (13.94, 28.8), (13.94, -9.6), (13.94, -48)):
            Hole(F_1_0MM_DOWEL_HOLE2_D / 2)

    # Ø1.0mm Dowel Hole3 (through all)
    with Locations(Plane(origin=(-1.118097245, 0, 0), x_dir=(0, 0, -1), z_dir=(1, 0, 0))):
        with Locations((-12, 80.1), (-88.02380551, 80.1), (-12, 48), (-88.02380551, 28.8), (-12, 9.6), (-88.02380551, -9.6), (-12, -28.8), (-88.02380551, -48), (-88.02380551, -80.1), (-12, -80.1)):
            Hole(F_1_0MM_DOWEL_HOLE3_D / 2)

    # CSK for M2 Flat Head Machine Screw5 (through all)
    with Locations(Plane(origin=(-1.118097245, 0, 0), x_dir=(0, 0, -1), z_dir=(1, 0, 0))):
        with Locations((-88.02380551, 48), (-12, 28.8), (-88.02380551, 9.6), (-12, -9.6), (-88.02380551, -28.8), (-12, -48)):
            CounterSinkHole(CSK_FOR_M2_FLAT_HEAD_MACHINE_SCREW5_D / 2, CSK_FOR_M2_FLAT_HEAD_MACHINE_SCREW5_CSINK_D / 2, counter_sink_angle=CSK_FOR_M2_FLAT_HEAD_MACHINE_SCREW5_CSINK_ANGLE)

    # Ø1.0mm Dowel Hole4
    with Locations(Plane.XY.offset(98.02380551)):
        with Locations((-6.94, 67.2), (-6.94, 48), (-6.94, 28.8), (-6.94, 9.6), (-6.94, -9.6), (-6.94, -28.8), (-6.94, -48), (-6.94, -67.2)):
            Hole(F_1_0MM_DOWEL_HOLE4_D / 2, depth=F_1_0MM_DOWEL_HOLE4_DEPTH)


solid = part.part
